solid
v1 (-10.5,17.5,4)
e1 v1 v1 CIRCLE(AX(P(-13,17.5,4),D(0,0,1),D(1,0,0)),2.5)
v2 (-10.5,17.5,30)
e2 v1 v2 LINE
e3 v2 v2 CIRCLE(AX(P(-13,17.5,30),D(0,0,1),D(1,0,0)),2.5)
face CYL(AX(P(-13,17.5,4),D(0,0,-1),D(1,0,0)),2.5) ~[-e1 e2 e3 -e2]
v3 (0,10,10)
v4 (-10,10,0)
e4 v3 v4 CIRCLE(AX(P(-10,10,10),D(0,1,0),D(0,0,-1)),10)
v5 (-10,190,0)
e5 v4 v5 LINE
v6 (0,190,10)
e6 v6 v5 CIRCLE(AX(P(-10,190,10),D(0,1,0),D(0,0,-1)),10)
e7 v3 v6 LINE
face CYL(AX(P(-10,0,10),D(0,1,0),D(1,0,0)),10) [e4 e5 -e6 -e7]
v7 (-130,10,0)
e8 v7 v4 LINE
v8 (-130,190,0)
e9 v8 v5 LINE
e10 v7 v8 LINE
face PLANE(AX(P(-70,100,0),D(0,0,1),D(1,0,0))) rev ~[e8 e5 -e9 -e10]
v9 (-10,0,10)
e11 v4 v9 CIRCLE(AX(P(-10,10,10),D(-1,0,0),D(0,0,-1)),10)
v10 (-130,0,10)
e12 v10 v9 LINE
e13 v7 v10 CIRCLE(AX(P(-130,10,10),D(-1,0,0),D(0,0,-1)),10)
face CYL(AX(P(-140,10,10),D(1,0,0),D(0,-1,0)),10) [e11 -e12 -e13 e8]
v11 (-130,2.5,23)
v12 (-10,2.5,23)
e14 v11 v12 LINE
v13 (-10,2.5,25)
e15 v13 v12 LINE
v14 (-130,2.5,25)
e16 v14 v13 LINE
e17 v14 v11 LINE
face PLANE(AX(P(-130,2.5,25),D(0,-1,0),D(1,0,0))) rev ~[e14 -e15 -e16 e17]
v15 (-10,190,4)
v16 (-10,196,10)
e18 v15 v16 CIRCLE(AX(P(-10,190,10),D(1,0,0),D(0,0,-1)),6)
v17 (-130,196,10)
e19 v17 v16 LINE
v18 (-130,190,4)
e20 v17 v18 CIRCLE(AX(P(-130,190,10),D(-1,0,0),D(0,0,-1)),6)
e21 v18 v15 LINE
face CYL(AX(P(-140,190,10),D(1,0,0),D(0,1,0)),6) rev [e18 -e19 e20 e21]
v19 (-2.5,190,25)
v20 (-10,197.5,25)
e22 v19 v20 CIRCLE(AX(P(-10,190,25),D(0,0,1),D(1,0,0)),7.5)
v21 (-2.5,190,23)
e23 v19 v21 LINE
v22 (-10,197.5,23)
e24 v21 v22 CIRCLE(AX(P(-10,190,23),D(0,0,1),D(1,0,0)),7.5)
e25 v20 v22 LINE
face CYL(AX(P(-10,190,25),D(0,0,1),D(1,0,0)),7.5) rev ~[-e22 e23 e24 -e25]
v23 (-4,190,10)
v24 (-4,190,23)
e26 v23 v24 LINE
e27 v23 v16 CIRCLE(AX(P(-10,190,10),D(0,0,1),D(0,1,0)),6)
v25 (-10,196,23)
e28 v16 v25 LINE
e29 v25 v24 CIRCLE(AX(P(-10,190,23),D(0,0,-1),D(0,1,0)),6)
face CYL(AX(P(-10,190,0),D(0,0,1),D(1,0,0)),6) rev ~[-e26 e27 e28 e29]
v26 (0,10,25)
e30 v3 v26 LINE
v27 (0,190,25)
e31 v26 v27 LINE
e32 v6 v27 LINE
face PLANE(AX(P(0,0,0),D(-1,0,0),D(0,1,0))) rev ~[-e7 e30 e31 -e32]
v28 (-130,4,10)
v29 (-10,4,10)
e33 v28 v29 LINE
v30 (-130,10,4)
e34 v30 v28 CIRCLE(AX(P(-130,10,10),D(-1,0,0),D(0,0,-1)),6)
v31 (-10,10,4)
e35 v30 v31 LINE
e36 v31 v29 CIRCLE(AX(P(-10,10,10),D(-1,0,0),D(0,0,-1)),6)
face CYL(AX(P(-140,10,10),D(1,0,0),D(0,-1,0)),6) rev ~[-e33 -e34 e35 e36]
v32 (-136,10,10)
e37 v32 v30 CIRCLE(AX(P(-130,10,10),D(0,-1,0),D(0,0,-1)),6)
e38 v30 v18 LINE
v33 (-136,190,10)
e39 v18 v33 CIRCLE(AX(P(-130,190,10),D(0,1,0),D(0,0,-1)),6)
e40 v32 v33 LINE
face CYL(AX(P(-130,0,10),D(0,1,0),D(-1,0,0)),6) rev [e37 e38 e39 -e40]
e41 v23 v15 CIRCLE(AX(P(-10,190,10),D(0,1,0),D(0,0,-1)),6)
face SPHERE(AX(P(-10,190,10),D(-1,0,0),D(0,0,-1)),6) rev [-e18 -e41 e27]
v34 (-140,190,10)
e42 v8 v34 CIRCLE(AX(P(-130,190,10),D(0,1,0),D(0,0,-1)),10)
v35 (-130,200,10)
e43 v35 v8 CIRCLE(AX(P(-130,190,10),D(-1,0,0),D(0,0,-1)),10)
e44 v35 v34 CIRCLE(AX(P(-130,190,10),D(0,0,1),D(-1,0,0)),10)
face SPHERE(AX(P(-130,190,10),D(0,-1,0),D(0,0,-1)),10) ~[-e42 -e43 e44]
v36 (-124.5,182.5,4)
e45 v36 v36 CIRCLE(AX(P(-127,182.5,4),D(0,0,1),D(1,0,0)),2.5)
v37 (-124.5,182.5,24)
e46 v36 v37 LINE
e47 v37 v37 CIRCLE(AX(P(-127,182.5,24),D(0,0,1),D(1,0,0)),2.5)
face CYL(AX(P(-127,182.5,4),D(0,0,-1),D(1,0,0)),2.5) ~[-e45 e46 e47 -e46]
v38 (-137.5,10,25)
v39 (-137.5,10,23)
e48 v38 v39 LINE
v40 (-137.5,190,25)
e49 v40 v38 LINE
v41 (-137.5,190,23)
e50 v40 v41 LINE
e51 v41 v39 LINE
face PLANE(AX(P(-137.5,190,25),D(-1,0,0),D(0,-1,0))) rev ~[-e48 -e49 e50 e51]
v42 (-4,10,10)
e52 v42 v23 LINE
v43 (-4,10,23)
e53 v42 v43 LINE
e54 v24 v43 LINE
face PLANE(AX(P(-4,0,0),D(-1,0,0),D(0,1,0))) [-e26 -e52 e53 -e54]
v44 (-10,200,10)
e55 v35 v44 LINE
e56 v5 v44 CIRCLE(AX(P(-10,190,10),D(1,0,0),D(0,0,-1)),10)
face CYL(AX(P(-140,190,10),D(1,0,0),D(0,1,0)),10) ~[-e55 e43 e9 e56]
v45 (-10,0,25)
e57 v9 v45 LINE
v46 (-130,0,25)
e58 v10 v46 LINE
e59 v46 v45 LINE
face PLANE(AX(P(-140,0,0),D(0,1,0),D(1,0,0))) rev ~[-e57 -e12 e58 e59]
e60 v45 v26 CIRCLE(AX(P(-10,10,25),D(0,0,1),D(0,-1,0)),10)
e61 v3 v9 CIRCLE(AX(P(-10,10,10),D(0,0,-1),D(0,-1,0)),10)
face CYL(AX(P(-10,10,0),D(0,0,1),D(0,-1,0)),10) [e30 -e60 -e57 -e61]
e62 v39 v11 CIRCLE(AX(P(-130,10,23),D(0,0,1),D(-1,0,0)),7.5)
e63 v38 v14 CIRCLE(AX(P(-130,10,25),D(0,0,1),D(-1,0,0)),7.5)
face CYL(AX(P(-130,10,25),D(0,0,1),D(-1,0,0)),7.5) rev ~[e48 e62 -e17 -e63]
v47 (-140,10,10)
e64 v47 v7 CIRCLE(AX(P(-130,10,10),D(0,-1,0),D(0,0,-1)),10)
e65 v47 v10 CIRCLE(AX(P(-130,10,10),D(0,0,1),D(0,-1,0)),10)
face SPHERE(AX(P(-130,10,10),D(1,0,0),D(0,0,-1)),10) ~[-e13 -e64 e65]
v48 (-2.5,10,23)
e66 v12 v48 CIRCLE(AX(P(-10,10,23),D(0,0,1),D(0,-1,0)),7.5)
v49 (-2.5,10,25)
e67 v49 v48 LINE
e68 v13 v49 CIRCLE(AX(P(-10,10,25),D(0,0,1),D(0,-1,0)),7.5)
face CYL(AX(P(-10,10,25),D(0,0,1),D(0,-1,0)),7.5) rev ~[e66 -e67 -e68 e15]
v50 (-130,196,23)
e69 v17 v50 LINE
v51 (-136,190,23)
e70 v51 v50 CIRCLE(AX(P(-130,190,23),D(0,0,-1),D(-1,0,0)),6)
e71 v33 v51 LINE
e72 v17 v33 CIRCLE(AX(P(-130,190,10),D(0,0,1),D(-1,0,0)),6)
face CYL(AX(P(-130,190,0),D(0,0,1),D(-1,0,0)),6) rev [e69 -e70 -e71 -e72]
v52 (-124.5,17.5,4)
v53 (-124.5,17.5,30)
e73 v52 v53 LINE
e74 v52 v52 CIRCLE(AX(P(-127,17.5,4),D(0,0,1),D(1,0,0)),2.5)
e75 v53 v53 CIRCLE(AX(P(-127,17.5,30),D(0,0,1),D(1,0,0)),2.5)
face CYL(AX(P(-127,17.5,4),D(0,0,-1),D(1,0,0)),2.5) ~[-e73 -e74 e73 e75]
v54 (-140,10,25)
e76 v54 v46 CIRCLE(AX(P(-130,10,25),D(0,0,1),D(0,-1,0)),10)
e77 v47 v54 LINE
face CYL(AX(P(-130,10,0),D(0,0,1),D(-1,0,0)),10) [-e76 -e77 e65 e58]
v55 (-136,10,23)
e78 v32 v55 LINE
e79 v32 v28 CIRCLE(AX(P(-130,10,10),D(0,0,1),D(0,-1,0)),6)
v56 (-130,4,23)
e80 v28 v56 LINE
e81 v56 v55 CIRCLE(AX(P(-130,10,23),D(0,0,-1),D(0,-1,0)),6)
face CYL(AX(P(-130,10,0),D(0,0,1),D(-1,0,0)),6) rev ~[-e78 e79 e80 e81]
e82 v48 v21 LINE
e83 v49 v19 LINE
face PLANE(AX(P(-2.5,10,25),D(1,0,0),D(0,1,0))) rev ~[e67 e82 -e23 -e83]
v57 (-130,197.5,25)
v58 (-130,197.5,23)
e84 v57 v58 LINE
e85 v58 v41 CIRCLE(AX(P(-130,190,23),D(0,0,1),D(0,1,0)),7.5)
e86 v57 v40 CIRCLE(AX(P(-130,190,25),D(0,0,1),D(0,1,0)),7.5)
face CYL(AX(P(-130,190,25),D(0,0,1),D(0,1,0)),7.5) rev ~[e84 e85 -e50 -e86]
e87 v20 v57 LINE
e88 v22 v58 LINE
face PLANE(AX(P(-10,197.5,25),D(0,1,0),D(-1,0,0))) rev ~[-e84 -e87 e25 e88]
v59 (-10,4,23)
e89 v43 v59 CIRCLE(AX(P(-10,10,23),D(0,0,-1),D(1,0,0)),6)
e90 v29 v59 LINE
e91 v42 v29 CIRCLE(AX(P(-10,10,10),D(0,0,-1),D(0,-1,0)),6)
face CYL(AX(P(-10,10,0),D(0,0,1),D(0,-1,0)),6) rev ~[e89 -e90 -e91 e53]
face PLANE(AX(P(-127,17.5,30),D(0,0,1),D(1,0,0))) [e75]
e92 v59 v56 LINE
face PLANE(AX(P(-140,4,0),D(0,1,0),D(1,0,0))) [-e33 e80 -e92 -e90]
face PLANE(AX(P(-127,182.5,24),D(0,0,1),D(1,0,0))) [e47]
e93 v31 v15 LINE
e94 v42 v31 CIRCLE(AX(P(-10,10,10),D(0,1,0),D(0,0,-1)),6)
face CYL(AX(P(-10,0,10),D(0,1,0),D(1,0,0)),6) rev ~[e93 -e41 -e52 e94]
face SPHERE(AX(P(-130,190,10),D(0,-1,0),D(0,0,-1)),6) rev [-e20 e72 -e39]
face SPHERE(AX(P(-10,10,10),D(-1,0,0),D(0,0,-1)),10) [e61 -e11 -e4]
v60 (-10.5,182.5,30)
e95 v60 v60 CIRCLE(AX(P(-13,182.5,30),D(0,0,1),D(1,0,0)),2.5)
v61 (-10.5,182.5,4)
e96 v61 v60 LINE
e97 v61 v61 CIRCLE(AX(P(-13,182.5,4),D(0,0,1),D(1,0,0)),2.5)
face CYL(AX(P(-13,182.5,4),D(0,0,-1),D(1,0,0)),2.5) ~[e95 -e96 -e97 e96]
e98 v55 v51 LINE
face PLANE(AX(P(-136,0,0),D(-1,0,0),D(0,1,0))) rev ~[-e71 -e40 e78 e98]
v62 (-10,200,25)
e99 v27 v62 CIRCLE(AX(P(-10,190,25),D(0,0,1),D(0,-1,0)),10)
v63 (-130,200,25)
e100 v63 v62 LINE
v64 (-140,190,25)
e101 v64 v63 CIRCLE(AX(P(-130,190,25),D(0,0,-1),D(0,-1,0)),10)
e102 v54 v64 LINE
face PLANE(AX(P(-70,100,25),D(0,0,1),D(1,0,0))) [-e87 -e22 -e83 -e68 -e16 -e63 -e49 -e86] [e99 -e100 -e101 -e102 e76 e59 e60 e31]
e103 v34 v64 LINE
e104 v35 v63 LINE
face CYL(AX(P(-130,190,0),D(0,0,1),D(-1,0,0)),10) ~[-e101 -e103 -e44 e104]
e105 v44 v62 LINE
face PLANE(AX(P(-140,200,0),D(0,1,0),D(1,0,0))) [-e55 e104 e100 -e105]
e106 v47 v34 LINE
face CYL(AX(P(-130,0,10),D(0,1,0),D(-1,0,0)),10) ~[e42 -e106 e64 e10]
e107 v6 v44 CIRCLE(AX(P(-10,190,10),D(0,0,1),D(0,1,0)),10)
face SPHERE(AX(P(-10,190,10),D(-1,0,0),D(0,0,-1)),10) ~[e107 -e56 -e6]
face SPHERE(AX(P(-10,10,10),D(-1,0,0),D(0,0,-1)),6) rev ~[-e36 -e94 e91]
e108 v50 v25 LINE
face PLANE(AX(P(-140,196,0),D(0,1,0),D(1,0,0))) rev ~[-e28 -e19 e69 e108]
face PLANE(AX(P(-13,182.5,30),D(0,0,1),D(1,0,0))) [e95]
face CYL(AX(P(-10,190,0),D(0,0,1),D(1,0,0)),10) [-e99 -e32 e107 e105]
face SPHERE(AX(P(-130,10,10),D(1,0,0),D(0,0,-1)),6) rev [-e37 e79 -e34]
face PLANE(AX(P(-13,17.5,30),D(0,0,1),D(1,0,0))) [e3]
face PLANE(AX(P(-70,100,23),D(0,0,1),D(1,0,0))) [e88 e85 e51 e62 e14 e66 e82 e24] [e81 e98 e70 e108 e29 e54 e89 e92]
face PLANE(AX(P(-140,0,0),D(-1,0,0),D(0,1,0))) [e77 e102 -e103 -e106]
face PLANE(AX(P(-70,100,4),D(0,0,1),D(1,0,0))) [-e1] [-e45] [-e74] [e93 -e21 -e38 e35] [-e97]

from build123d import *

# Parameters (mm, degrees)
F0_W     = 140
F0_H     = 200
F1_DEPTH = 25
F2_R     = 10
F3_T     = -4
F5_DEPTH = 2
F6_R     = 2.5
F7_DEPTH = 26
F8_R     = 2.5
F9_DEPTH = 6


with BuildPart() as f1:
    # F0 (on Top) → F1 (new body)
    with BuildSketch(Plane.XY):
        with Locations((-70, 100)):
            Rectangle(F0_W, F0_H)
    extrude(amount=F1_DEPTH)

    # F2
    f2_edges = [f1.edges().sort_by_distance(p)[0] for p in [
        (-70, 0, 0),
        (-140, 100, 0),
        (-70, 200, 0),
        (0, 100, 0),
        (-140, 0, 12.5),
        (0, 0, 12.5),
        (0, 200, 12.5),
        (-140, 200, 12.5),
    ]]
    fillet(f2_edges, radius=F2_R)

    # F3
    f3_openings = [f1.faces().sort_by_distance(p)[0] for p in [
        (-70, 100, 25),
    ]]
    offset(amount=F3_T, openings=f3_openings)

    # F4 (on face) → F5 (cut)
    with BuildSketch(Plane.XY.offset(25)):
        with BuildLine():
            Line((-2.5, 10), (-2.5, 190))
            ThreePointArc((-2.5, 190), (-4.6966991411, 195.3033008589), (-10, 197.5))
            Line((-10, 197.5), (-130, 197.5))
            ThreePointArc((-130, 197.5), (-135.3033008589, 195.3033008589), (-137.5, 190))
            Line((-137.5, 190), (-137.5, 10))
            ThreePointArc((-137.5, 10), (-135.3033008589, 4.6966991411), (-130, 2.5))
            Line((-130, 2.5), (-10, 2.5))
            ThreePointArc((-10, 2.5), (-4.6966991411, 4.6966991411), (-2.5, 10))
        make_face()
        with BuildLine():
            ThreePointArc((-136, 190), (-134.2426406871, 194.2426406871), (-130, 196))
            Line((-130, 196), (-10, 196))
            ThreePointArc((-10, 196), (-5.7573593129, 194.2426406871), (-4, 190))
            Line((-4, 190), (-4, 10))
            ThreePointArc((-4, 10), (-5.7573593129, 5.7573593129), (-10, 4))
            Line((-10, 4), (-130, 4))
            ThreePointArc((-130, 4), (-134.2426406871, 5.7573593129), (-136, 10))
            Line((-136, 10), (-136, 190))
        make_face(mode=Mode.SUBTRACT)
    extrude(amount=-F5_DEPTH, mode=Mode.SUBTRACT)

    # F6 (on face) → F7 (join)
    with BuildSketch(Plane.XY.offset(4)):
        with Locations((-127, 182.5)):
            Circle(F6_R)
        with Locations((-13, 182.5)):
            Circle(F6_R)
        with Locations((-127, 17.5)):
            Circle(F6_R)
        with Locations((-13, 17.5)):
            Circle(F6_R)
    extrude(amount=F7_DEPTH)

    # F8 (on face) → F9 (cut)
    with BuildSketch(Plane.XY.offset(30)):
        with Locations((-127, 182.5)):
            Circle(F8_R)
    extrude(amount=-F9_DEPTH, mode=Mode.SUBTRACT)


solid = f1.part
